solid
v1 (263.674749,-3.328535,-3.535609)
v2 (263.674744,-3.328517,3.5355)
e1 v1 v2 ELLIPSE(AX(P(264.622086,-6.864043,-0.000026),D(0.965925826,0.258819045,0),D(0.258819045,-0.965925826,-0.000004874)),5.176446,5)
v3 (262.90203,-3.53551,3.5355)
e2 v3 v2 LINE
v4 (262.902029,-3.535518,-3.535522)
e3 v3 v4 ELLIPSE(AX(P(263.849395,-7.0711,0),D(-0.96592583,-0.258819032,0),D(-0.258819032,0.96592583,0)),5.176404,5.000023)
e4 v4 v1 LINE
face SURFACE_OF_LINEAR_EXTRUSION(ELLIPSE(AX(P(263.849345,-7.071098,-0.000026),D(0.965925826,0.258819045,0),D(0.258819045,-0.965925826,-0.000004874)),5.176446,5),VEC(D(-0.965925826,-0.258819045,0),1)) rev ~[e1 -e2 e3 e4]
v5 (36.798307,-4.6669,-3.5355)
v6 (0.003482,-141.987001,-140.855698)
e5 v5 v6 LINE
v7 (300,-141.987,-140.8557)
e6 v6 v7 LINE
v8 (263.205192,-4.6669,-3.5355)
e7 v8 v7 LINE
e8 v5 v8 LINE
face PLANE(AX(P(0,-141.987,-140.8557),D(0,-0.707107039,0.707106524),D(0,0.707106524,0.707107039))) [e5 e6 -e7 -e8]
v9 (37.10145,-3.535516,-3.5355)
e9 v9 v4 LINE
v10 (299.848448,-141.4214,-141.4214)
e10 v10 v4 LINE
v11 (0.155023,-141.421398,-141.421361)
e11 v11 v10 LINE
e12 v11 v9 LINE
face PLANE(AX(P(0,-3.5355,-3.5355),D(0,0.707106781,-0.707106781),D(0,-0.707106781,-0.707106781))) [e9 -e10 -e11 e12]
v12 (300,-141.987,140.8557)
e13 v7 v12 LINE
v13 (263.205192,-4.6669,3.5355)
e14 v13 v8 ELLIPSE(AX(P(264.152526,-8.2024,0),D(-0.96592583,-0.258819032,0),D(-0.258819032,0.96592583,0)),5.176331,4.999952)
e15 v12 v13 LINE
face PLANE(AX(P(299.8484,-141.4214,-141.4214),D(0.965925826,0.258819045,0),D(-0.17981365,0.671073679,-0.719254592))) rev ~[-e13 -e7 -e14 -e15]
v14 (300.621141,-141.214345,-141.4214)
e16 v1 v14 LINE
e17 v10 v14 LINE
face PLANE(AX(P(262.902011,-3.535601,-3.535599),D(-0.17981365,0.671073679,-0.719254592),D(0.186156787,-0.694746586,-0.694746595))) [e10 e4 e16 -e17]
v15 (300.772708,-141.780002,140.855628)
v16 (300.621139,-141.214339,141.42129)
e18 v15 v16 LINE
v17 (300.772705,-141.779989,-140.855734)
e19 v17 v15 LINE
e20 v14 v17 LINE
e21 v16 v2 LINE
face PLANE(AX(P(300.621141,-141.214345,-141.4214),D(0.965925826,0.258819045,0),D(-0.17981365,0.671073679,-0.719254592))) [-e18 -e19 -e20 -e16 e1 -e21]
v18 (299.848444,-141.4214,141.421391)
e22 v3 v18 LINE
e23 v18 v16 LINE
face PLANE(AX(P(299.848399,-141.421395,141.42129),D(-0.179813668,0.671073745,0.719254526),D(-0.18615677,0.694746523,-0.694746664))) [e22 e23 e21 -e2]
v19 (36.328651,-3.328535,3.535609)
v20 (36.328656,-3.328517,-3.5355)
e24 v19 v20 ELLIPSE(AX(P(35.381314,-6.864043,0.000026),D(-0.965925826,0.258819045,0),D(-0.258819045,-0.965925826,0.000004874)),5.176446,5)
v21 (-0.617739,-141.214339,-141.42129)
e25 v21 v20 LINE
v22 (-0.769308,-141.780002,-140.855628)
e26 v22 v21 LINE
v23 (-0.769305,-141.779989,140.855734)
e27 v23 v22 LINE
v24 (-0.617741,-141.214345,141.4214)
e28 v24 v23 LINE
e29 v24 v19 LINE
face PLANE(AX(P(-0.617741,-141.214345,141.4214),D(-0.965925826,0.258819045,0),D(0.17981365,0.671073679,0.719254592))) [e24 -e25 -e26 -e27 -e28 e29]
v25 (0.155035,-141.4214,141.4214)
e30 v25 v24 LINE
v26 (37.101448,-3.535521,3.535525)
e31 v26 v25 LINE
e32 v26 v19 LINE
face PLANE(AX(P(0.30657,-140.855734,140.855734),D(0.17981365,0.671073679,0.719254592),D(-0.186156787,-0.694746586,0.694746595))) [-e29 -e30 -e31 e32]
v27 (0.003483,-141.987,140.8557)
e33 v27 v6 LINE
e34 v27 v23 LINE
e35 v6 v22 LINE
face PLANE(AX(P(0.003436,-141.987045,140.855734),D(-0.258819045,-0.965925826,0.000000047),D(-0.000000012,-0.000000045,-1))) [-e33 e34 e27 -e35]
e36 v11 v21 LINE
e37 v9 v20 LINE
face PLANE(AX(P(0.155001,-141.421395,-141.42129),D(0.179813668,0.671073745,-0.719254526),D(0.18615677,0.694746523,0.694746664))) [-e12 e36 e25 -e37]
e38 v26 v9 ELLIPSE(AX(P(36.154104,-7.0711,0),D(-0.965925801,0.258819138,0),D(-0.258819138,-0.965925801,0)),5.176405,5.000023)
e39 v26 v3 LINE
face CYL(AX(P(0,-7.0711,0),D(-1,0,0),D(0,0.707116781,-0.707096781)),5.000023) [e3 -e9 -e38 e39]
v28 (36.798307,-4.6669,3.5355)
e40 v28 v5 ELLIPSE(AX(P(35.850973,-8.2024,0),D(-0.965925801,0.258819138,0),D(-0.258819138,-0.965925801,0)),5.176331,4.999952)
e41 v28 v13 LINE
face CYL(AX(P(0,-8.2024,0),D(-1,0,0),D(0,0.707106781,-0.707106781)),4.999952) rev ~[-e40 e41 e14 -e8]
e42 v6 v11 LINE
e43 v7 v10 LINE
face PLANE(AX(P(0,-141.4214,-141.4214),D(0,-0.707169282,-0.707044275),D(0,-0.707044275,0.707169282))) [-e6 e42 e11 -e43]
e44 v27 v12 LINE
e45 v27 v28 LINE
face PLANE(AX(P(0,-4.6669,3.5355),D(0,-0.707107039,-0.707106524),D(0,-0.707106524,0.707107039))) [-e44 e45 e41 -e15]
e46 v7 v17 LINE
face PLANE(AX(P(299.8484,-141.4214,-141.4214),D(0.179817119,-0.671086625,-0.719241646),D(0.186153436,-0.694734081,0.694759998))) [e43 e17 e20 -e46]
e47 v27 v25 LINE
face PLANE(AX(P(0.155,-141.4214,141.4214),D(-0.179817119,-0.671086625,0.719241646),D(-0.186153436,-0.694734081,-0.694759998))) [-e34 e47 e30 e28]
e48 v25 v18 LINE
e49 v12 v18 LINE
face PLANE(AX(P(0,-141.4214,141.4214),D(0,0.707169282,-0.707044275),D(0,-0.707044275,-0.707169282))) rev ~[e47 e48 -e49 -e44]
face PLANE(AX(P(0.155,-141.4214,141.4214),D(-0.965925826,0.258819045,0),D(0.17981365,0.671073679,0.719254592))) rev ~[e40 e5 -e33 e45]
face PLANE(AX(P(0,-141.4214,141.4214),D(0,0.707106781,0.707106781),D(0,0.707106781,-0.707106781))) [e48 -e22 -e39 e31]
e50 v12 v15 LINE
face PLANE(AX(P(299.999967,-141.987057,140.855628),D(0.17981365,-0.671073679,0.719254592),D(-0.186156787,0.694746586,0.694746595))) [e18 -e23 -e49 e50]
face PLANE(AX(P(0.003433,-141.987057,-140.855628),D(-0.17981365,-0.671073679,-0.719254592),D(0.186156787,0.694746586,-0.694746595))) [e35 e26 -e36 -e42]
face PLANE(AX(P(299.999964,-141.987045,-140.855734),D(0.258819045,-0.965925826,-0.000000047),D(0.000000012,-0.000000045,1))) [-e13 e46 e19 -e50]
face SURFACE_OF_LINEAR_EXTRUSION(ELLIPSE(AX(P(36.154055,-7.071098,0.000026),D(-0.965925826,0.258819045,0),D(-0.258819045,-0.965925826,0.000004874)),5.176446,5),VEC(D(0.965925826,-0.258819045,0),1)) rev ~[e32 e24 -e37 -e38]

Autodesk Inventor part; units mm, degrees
ref_plane "YZ Plane" through (0, 0, 0) normal (1, 0, 0) x (0, 1, 0)
ref_plane "XZ Plane" through (0, 0, 0) normal (0, 1, 0) x (-1, 0, 0)
ref_plane "XY Plane" through (0, 0, 0) normal (0, 0, 1) x (1, 0, 0)
sketch "Sketch1" plane through (0, 0, 0) normal (1, 0, 0) x (0, 1, 0)
  line L0 (-141.4214, 141.4214) -> (-3.5355, 3.5355)
  line L1 (-141.4214, 141.4214) -> (53.5786, 141.4214) construction
  line L2 (-3.5355, -3.5355) -> (-141.4214, -141.4214)
  line L3 (-141.987, -140.8557) -> (-4.6669, -3.5355)
  line L4 (-4.6669, 3.5355) -> (-141.987, 140.8557)
  line L5 (-141.4214, 141.4214) -> (-141.987, 140.8557)
  line L6 (-141.4214, -141.4214) -> (-141.987, -140.8557)
  arc A0 (-4.6669, -3.5355) -> (-4.6669, 3.5355) centre (-8.2024, 0) ccw
  arc A1 (-3.5355, -3.5355) -> (-3.5355, 3.5355) centre (-7.0711, 0) ccw
  point P0 (0, 0)
  point P1 (0, 0)
  point P2 (-1.1314, 0)
  dimension "d0" = 45
  dimension "d1" = 200
  dimension "d2" = 0.8
  dimension "d3" = 0.8
  dimension "d4" = 200
  dimension "d7" = 5
extrude "Extrusion1" add sketch "Sketch1" along normal blind 300
sketch "Sketch4" plane through (0, 0, 0) normal (0, 0, 1) x (1, 0, 0)
  line L0 (0, -141.4214) -> (0, -3.5355) projected
  line L1 (0, -141.4214) -> (300, -141.4214) projected
  line L2 (300, -3.5355) -> (300, -141.4214) projected
  line L3 (0, -3.5355) -> (300, -3.5355) projected
  line L4 (300, -4.6669) -> (300, -141.987) projected
  line L5 (300, -141.987) -> (261.9547, 0)
  line L6 (300, -141.987) -> (444.3601, -141.987) construction
  line L7 (0, -141.987) -> (145.1381, -141.987) construction
  line L8 (300, -2.5459) -> (300, -141.987)
  line L9 (261.9547, 0) -> (300, 0)
  line L10 (300, -3.5355) -> (300, -141.4214) projected
  line L11 (300, 0) -> (300, -3.5355)
  point P0 (0, 0)
  point P1 (262.6369, -2.5459)
  dimension "d10" = 105
extrude "Extrusion2" cut sketch "Sketch4" along normal through all both and the other way through all contours L5 L3 L2 L1 | L1 L4 L5 | L5 L9 L11 L8 L3
sketch "Sketch5" plane through (299.8484, -141.4214, -141.4214) normal (0.9659258, 0.258819, 0) x (-0.1798136, 0.6710737, -0.7192546)
  line L0 (-203.4359, 195.6898) -> (-203.4359, 196.504) projected
  line L1 (-5.8996, 202.5394) -> (-203.4359, 195.6898) projected
  ellipse E0 centre (-5.8996, 197.4504) end of major axis (-2.3034, 201.1736) minor radius 5 (-0.8137, 197.6268) -> (-5.8996, 202.5394) ccw projected
  line L2 (-0.8137, -0.0282) -> (-0.8137, 197.6268) projected
  line L3 (0, 0) -> (-0.8137, -0.0282) projected
  line L4 (0, 198.4692) -> (0, 0) projected
  ellipse E1 centre (-5.0859, 198.2929) end of major axis (-8.6822, 194.5697) minor radius 5 (0, 198.4692) -> (-5.0859, 203.3818) ccw projected
  line L5 (-203.4359, 196.504) -> (-5.0859, 203.3818) projected
  line L6 (-0.8137, -0.0282) -> (-203.4359, 195.6898)
  point P0 (47.103, 252.3228)
extrude "Extrusion3" add sketch "Sketch5" along normal blind 0.8
sketch "Sketch7" plane through (0, 0, 0) normal (0, 0, 1) x (1, 0, 0)
  line L0 (0, -142) -> (38.0488, 0)
  line L1 (0, -142) -> (147.0092, -142) construction
  line L2 (38.0488, 0) -> (0, 0)
  line L3 (0, -3.5355) -> (262.902, -3.5355) projected
  line L4 (0, 0) -> (0, -142)
  dimension "d18" = 75
extrude "Extrusion4" cut sketch "Sketch7" along normal through all both and the other way through all
sketch "Sketch8" plane through (0.155, -141.4214, 141.4214) normal (-0.9659258, 0.258819, 0) x (0.1798136, 0.6710737, 0.7192546)
  ellipse E0 centre (-5.8996, 197.4504) end of major axis (-2.3034, 201.1736) minor radius 5 (-0.8137, 197.6268) -> (-5.8996, 202.5394) ccw projected
  line L0 (-0.8137, -0.0282) -> (-0.8137, 197.6268) projected
  line L1 (0, 0) -> (-0.8137, -0.0282) projected
  line L2 (0, 198.4692) -> (0, 0) projected
  ellipse E1 centre (-5.0859, 198.2929) end of major axis (-8.6822, 194.5697) minor radius 5 (0, 198.4692) -> (-5.0859, 203.3818) ccw projected
  line L3 (-203.4359, 196.504) -> (-5.0859, 203.3818) projected
  line L4 (-203.4359, 195.6898) -> (-203.4359, 196.504) projected
  line L5 (-5.8996, 202.5394) -> (-203.4359, 195.6898) projected
  line L6 (-0.8137, -0.0282) -> (53.1297, 55.8182) projected
  line L7 (-5.8996, 202.5394) -> (-203.4359, 195.6898) projected
  line L8 (-0.8137, -0.0282) -> (-203.4359, 195.6898)
  point P0 (-6.8417, 196.4751)
extrude "Extrusion5" add sketch "Sketch8" along normal blind 0.8
equation "\"BendRadius\" = Thickness"
equation "\"BendReliefWidth\" = Thickness"
equation "\"BendReliefDepth\" = 0.5 * Thickness"
equation "\"CornerReliefSize\" = 4 * Thickness"
equation "\"MinimumRemnant\" = 2 * Thickness"
equation "\"TransitionRadius\" = BendRadius"
equation "\"JacobiRadiusSize\" = Thickness"
equation "\"GapSize\" = Thickness"
equation "\"Thickness\" = 0.5"
properties part number "chimneyRoof"
